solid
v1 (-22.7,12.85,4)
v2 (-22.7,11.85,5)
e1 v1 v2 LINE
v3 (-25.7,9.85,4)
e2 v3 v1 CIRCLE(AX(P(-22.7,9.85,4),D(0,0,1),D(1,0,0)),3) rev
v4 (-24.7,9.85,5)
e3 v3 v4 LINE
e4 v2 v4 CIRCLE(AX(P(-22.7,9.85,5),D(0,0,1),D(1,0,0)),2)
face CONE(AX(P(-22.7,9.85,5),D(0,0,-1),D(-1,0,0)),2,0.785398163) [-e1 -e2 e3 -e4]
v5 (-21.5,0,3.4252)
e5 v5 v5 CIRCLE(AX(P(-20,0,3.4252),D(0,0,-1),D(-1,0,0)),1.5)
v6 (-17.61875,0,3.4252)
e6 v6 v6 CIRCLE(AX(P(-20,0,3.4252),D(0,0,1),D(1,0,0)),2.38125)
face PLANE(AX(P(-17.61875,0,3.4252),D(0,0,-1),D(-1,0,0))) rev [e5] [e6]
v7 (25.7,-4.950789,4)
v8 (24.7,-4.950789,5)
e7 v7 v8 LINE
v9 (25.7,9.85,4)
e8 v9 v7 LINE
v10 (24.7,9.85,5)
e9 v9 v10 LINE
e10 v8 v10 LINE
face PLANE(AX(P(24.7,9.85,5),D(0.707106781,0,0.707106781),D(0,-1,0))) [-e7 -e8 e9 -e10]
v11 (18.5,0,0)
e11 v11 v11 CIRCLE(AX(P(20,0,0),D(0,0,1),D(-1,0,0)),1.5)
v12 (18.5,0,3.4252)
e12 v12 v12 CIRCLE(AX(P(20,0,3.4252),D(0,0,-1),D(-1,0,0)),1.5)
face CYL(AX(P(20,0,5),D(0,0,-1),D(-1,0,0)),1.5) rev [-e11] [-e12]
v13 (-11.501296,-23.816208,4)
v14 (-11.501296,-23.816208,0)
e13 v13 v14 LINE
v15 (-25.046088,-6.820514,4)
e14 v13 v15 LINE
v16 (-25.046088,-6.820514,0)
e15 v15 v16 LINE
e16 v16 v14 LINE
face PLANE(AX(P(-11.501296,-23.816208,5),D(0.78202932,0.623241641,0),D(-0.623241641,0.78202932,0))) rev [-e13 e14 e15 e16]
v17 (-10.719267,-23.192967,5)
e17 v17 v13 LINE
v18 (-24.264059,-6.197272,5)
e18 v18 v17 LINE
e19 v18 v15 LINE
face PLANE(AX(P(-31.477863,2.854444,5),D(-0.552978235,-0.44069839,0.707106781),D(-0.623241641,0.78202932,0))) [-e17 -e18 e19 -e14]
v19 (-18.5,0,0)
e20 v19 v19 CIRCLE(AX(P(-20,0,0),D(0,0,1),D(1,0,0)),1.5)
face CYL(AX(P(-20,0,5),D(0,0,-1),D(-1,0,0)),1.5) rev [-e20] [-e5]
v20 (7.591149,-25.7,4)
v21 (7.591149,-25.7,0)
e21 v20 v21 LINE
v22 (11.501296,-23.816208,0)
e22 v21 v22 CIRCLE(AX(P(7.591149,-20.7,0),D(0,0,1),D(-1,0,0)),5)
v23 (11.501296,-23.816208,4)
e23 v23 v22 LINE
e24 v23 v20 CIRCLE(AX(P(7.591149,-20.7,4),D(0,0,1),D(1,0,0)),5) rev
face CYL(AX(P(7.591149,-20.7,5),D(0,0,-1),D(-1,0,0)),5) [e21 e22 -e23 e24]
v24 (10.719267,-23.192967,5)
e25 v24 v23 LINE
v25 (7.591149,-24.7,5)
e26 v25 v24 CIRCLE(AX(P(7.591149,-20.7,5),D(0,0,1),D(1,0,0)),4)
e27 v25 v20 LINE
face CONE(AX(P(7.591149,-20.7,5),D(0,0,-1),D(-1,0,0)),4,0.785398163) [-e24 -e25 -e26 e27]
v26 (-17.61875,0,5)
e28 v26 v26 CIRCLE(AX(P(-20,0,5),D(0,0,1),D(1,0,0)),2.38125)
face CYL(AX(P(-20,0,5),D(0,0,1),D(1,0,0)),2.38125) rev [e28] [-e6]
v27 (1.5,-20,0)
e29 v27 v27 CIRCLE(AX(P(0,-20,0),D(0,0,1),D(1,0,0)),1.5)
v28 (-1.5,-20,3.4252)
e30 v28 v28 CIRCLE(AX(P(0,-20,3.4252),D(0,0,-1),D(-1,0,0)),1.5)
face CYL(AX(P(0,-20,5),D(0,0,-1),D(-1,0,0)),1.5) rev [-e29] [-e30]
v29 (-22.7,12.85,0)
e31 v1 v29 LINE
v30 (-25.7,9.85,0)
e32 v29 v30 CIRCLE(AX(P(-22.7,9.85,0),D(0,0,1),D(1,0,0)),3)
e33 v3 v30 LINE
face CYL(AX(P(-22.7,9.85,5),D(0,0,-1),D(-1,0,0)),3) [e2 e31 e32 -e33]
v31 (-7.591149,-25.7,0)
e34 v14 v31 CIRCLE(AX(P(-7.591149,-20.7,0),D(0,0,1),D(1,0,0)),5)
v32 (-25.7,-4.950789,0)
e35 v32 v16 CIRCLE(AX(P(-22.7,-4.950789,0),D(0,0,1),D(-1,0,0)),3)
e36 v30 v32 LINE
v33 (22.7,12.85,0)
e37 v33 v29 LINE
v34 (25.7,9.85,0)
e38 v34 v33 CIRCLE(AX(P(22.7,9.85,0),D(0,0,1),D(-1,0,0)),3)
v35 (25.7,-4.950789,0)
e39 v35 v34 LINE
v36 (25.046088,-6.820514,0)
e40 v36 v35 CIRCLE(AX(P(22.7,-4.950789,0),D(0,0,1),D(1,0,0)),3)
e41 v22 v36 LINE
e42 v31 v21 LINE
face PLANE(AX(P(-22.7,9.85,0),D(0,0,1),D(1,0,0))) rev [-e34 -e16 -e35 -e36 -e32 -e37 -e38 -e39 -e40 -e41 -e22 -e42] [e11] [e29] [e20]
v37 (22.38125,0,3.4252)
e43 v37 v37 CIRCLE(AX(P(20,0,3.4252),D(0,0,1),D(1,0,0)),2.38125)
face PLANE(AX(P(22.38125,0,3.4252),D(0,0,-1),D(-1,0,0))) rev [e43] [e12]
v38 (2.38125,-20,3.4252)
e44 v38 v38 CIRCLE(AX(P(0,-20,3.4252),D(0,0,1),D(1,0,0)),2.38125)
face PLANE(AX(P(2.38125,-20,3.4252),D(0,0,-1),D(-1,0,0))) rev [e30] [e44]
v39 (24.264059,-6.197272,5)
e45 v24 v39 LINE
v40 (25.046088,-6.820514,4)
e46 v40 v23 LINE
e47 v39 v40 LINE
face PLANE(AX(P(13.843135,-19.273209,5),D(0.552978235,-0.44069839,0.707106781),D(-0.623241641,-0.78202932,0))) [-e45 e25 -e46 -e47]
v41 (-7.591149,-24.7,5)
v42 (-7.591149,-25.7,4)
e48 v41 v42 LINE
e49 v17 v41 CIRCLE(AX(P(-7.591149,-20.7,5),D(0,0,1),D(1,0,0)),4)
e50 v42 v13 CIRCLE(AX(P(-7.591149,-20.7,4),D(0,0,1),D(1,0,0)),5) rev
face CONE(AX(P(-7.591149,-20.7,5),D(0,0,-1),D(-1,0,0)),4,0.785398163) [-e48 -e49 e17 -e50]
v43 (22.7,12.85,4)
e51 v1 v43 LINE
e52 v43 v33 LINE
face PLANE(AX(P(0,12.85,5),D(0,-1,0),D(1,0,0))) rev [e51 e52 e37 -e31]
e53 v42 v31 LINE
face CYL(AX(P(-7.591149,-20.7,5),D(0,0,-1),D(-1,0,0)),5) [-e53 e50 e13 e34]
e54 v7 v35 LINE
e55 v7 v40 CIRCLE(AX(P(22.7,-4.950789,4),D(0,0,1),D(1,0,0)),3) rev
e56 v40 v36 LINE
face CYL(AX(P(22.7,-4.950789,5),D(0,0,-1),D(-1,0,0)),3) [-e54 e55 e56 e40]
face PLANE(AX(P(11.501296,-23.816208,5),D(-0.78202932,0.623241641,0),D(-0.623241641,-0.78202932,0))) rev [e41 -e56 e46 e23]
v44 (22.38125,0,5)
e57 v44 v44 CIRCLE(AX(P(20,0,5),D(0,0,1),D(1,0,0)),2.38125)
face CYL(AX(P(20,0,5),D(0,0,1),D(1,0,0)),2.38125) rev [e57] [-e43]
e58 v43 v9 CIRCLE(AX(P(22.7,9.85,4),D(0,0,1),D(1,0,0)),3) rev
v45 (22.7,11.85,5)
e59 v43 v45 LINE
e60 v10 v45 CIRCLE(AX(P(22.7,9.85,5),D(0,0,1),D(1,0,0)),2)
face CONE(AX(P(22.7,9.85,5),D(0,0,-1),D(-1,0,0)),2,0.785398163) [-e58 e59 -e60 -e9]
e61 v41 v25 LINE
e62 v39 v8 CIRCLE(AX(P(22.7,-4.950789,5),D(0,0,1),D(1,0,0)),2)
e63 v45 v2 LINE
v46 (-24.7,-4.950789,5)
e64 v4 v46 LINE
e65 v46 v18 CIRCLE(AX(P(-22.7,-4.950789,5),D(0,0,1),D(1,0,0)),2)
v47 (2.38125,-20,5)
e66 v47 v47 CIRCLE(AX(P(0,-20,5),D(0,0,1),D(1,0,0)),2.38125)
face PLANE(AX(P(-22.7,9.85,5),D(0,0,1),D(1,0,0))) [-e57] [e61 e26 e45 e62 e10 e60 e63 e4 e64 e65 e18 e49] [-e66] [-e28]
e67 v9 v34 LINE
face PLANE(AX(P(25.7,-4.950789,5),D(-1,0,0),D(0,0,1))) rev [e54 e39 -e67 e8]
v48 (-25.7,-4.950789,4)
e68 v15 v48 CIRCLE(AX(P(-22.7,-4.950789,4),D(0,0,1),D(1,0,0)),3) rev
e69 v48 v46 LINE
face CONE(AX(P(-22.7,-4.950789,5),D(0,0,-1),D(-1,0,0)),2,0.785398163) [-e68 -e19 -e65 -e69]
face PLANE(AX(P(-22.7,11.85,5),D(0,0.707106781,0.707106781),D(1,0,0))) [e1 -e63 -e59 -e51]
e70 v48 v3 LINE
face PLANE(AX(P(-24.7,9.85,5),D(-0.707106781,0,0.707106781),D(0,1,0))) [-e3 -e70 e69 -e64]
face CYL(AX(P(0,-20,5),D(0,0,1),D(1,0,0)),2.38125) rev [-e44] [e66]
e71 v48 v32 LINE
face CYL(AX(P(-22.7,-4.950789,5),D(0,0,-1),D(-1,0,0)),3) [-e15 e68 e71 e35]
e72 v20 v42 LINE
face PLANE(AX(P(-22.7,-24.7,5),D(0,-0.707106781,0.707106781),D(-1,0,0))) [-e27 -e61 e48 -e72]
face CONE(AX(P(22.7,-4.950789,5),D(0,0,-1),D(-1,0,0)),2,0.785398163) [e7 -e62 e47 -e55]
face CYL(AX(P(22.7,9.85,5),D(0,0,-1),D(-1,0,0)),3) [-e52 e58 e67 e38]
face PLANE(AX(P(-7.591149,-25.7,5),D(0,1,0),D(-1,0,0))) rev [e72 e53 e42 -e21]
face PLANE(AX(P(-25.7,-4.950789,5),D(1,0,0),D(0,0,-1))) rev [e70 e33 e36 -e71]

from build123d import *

# Parameters (mm, degrees)
CROQUIS1_R                   = 1.5
SALIENTE_EXTRUIR1_DEPTH      = 5
CHAFL_N1_SIZE                = 1
TALADROAVANZADO1_START       = 3.4252
TALADROAVANZADO1_OUTLINE_R   = 2.38125
TALADROAVANZADO1_OUTLINE_R_2 = 1.5
TALADROAVANZADO1_DEPTH       = 1.5748


# Read off the part's stored shape, not the designer's step: TaladroAvanzado1
with BuildPart() as part:
    # Croquis1 → Saliente-Extruir1 (new body)
    with BuildSketch(Plane.XY):
        with BuildLine():
            Line((-7.5911494, -25.7), (7.5911494, -25.7))
            ThreePointArc((7.5911494, -25.7), (9.761282919, -25.204500029), (11.501296, -23.816208204))
            Line((11.501296, -23.816208204), (25.04608796, -6.820513834))
            ThreePointArc((25.04608796, -6.820513834), (25.531807186, -5.941176745), (25.7, -4.950788912))
            Line((25.7, -4.950788912), (25.7, 9.85))
            ThreePointArc((25.7, 9.85), (24.821320344, 11.971320344), (22.7, 12.85))
            Line((22.7, 12.85), (0, 12.85))
            Line((0, 12.85), (-22.7, 12.85))
            ThreePointArc((-22.7, 12.85), (-24.821320344, 11.971320344), (-25.7, 9.85))
            Line((-25.7, 9.85), (-25.7, -4.950788912))
            ThreePointArc((-25.7, -4.950788912), (-25.531807186, -5.941176745), (-25.04608796, -6.820513834))
            Line((-25.04608796, -6.820513834), (-11.501296, -23.816208204))
            ThreePointArc((-11.501296, -23.816208204), (-9.761282919, -25.204500029), (-7.5911494, -25.7))
        make_face()
        with Locations((-20, 0)):
            Circle(CROQUIS1_R, mode=Mode.SUBTRACT)
        with Locations(Location((20, 0, 0), (0, 0, 180))):
            Circle(CROQUIS1_R, mode=Mode.SUBTRACT)
        with Locations((0, -20)):
            Circle(CROQUIS1_R, mode=Mode.SUBTRACT)
    extrude(amount=SALIENTE_EXTRUIR1_DEPTH)

    # Chaflán1
    chafl_n1_edges = [part.edges().sort_by_distance(p)[0] for p in [
        (-25.7, 2.449605544, 5),
        (-25.531807186, -5.941176745, 5),
        (-18.27369198, -15.318361019, 5),
        (-9.761282919, -25.204500029, 5),
        (0, -25.7, 5),
        (9.761282919, -25.204500029, 5),
        (18.27369198, -15.318361019, 5),
        (25.531807186, -5.941176745, 5),
        (25.7, 2.449605544, 5),
        (24.821320344, 11.971320344, 5),
        (0, 12.85, 5),
        (-24.821320344, 11.971320344, 5),
    ]]
    chamfer(chafl_n1_edges, length=CHAFL_N1_SIZE)

    # TaladroAvanzado1 outline → TaladroAvanzado1 (cut)
    # profile 1 of 3: a face of its own
    with BuildSketch(Plane.XY.offset(TALADROAVANZADO1_START)):
        with Locations((0, -20)):
            Circle(TALADROAVANZADO1_OUTLINE_R)
        with Locations((0, -20)):
            Circle(TALADROAVANZADO1_OUTLINE_R_2, mode=Mode.SUBTRACT)
    # profile 2 of 3: a face of its own
    with BuildSketch(Plane.XY.offset(TALADROAVANZADO1_START)):
        with Locations((20, 0)):
            Circle(TALADROAVANZADO1_OUTLINE_R)
        with Locations((20, 0)):
            Circle(TALADROAVANZADO1_OUTLINE_R_2, mode=Mode.SUBTRACT)
    # profile 3 of 3: a face of its own
    with BuildSketch(Plane.XY.offset(TALADROAVANZADO1_START)):
        with Locations((-20, 0)):
            Circle(TALADROAVANZADO1_OUTLINE_R)
        with Locations((-20, 0)):
            Circle(TALADROAVANZADO1_OUTLINE_R_2, mode=Mode.SUBTRACT)
    extrude(amount=TALADROAVANZADO1_DEPTH, mode=Mode.SUBTRACT)


solid = part.part
